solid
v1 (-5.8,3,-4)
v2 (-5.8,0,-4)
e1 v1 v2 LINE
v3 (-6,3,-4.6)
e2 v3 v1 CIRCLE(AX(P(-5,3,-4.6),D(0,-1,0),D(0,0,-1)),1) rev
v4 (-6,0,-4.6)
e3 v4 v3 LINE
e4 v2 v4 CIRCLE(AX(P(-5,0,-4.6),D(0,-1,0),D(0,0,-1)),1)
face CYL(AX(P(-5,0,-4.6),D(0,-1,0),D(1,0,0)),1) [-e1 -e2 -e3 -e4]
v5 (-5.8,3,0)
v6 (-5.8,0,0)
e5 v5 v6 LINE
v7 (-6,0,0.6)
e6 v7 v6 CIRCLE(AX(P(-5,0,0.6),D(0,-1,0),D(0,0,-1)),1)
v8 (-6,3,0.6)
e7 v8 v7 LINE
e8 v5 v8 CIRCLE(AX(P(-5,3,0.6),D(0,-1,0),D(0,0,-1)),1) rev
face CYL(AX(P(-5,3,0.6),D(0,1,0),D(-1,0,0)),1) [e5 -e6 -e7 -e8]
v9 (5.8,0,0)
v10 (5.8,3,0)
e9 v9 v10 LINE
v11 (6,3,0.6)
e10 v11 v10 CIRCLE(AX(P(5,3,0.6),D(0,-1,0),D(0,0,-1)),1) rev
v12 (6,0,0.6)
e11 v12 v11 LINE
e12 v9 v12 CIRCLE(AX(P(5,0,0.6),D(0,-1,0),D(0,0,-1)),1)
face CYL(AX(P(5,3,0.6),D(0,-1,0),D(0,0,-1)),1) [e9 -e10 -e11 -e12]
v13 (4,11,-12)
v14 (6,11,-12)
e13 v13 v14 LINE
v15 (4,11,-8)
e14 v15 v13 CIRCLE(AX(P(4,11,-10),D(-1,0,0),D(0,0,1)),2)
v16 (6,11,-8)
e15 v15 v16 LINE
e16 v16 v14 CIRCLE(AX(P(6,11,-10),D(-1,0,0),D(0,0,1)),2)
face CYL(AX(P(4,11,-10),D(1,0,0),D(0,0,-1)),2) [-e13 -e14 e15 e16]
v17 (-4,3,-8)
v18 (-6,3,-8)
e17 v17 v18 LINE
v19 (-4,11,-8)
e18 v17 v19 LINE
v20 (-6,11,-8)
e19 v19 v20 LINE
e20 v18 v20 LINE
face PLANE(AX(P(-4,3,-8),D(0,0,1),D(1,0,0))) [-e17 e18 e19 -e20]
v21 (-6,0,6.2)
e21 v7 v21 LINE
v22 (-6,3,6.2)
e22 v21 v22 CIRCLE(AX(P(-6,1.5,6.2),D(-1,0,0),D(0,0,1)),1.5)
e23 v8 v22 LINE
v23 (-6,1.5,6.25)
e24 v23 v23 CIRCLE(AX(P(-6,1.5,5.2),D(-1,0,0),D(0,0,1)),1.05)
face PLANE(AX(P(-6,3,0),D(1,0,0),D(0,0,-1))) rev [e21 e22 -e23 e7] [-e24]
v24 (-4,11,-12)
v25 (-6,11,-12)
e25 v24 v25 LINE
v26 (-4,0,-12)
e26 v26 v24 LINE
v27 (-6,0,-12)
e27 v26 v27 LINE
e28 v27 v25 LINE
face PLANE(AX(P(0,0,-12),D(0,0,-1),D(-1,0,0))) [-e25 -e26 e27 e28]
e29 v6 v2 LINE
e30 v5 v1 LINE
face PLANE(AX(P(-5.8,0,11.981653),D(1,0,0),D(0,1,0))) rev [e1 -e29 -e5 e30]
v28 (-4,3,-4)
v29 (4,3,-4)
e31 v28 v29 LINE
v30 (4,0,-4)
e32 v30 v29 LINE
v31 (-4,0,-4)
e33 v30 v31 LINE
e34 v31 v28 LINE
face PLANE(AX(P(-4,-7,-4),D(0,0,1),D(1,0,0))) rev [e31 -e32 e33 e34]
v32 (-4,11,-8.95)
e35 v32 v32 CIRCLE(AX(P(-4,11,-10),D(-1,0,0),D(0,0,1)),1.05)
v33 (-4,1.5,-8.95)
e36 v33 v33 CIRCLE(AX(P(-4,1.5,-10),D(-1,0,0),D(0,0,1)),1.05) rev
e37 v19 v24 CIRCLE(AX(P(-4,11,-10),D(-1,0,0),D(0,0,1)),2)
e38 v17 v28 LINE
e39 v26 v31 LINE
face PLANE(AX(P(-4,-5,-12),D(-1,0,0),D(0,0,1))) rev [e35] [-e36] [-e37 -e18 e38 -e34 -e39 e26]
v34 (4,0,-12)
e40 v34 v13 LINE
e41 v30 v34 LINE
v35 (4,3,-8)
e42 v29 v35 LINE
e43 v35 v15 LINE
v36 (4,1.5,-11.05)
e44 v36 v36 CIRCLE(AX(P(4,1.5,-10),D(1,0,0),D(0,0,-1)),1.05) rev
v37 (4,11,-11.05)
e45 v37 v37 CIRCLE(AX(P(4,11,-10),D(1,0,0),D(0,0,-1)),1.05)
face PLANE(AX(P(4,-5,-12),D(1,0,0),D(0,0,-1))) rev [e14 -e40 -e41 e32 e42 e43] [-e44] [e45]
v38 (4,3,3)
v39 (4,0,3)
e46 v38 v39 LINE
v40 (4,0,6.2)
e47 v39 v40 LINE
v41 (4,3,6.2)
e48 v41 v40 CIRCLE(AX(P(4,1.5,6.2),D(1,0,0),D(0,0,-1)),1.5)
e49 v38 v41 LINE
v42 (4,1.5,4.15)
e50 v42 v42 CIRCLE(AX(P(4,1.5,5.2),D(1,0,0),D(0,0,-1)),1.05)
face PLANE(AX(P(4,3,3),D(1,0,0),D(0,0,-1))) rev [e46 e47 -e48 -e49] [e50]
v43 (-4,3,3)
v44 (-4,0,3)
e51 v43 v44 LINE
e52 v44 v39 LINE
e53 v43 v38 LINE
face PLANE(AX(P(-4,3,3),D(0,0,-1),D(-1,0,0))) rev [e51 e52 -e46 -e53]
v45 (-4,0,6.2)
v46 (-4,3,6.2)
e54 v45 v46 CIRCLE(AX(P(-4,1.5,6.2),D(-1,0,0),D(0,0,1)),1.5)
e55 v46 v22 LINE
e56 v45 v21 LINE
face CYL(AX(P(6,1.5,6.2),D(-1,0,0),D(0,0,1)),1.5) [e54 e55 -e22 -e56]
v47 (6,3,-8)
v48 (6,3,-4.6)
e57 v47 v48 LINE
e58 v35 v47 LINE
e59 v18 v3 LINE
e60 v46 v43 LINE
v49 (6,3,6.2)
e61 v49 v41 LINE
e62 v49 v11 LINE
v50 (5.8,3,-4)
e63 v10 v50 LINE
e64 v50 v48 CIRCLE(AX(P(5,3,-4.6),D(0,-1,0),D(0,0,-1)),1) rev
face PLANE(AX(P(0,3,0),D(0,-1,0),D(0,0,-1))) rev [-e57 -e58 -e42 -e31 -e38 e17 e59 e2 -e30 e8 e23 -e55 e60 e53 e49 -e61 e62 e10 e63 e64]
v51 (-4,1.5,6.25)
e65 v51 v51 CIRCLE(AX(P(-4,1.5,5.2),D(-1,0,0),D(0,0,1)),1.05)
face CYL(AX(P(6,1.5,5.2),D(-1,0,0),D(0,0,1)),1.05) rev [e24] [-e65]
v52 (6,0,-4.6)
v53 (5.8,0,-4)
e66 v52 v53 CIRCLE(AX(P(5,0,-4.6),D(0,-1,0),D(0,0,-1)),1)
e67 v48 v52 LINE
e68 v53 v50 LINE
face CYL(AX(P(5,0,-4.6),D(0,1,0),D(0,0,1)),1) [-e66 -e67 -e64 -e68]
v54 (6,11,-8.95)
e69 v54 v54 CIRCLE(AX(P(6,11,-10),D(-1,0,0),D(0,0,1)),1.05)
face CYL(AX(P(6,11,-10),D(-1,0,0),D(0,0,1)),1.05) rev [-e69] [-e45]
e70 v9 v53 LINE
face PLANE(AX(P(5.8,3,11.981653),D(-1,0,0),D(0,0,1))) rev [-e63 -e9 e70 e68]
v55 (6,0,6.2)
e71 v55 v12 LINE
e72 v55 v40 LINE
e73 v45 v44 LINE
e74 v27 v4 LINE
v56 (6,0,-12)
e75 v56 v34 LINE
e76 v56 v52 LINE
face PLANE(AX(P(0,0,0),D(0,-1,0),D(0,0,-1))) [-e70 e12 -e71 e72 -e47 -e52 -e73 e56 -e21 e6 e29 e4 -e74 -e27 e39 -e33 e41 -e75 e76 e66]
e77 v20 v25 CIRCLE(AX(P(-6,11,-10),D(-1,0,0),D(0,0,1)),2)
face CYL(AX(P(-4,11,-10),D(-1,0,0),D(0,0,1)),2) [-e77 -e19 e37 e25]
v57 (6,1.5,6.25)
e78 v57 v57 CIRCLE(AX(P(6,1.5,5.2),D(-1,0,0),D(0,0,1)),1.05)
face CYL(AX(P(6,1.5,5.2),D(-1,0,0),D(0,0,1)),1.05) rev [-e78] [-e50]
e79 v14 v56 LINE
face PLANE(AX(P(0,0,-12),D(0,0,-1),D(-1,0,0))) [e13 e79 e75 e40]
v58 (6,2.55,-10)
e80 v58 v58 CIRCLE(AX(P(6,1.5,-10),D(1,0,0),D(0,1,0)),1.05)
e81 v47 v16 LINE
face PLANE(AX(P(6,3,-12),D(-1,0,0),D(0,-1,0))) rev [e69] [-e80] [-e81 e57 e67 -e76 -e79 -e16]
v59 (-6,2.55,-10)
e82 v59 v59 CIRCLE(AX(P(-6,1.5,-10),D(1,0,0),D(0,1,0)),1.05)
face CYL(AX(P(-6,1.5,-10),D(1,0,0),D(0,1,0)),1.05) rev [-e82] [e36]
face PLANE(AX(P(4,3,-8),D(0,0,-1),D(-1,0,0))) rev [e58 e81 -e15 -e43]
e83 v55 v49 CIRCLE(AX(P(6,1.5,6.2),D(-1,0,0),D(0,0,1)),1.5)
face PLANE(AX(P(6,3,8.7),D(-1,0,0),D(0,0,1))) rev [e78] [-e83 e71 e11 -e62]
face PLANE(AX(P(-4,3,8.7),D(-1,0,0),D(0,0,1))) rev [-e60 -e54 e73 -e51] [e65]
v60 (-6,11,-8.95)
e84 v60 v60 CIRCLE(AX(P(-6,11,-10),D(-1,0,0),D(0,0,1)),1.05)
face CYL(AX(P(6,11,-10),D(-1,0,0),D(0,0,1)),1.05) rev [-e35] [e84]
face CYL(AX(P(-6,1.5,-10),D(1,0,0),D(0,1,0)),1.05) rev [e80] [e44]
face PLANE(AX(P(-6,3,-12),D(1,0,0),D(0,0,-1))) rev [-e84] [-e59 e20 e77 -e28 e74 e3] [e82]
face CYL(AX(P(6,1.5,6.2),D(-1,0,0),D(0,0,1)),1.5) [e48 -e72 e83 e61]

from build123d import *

# Parameters (mm, degrees)
EXTRUDE_1_DEPTH          = 3
SKETCH_2_OUTSIDE_W       = 13.724
SKETCH_2_OUTSIDE_H       = 8.024
CUT_EXTRUDE_1_DEPTH      = 12
SKETCH_3_R               = 1.05
CUT_EXTRUDE_2_DEPTH      = 12
SKETCH_4_R               = 0.95
EXTRUDE_2_DEPTH          = 4
SKETCH_5_W               = 12
SKETCH_5_H               = 3
EXTRUDE_3_DEPTH          = 8
SKETCH_6_R               = 1.05
CUT_EXTRUDE_3_DEPTH      = 12
SKETCH_8_W               = 8
SKETCH_8_H               = 4
CUT_EXTRUDE_4_DEPTH      = 8
EXTRUDE_5_DEPTH          = 2
SKETCH_12_W              = 11.6
SKETCH_12_H              = 3
EXTRUDE_8_DEPTH          = 4
FILLET_1_R               = 1
SKETCH_13_W              = 8
SKETCH_13_H              = 4
CUT_EXTRUDE_5_DEPTH      = 10
FILLET_2_R               = 1
CUT_EXTRUDE_6_DEPTH      = 21.322401433
CUT_EXTRUDE_6_DEPTH_BACK = 21.322401433
SKETCH_11_R              = 1.05


with BuildPart() as part:
    # 草图1 → 凸台-拉伸1 (new body)
    with BuildSketch(Plane(origin=(0, 0, 0), x_dir=(1, 0, 0), z_dir=(0, 1, 0))):
        Polygon((-6, 0), (6, 0), (6, -8.7), (4, -8.7), (4, -3), (-4, -3), (-4, -8.7), (-6, -8.7), align=None)
    extrude(amount=EXTRUDE_1_DEPTH)

    # 草图2 outside → 切除-拉伸1 (cut)
    with BuildSketch(Plane.ZY.offset(6)):
        with Locations((4.35, 1.5)):
            Rectangle(SKETCH_2_OUTSIDE_W, SKETCH_2_OUTSIDE_H)
        with BuildLine():
            Line((6.2, 3), (0, 3))
            Line((0, 3), (0, 0))
            Line((0, 0), (6.2, 0))
            ThreePointArc((6.2, 0), (7.7, 1.5), (6.2, 3))
        make_face(mode=Mode.SUBTRACT)
    extrude(amount=-CUT_EXTRUDE_1_DEPTH, mode=Mode.SUBTRACT)

    # 草图3 → 切除-拉伸2 (cut)
    with BuildSketch(Plane.ZY.offset(6)):
        with Locations((5.2, 1.5)):
            Circle(SKETCH_3_R)
    extrude(amount=-CUT_EXTRUDE_2_DEPTH, mode=Mode.SUBTRACT)

    # 草图4 → 凸台-拉伸2 (add)
    with BuildSketch(Plane(origin=(0, 0, 0), x_dir=(-1, 0, 0), z_dir=(0, 0, -1))):
        with Locations((0, 1.5)):
            Circle(SKETCH_4_R)
    extrude(amount=EXTRUDE_2_DEPTH)

    # 草图5 → 凸台-拉伸3 (add)
    with BuildSketch(Plane(origin=(0, 0, -4), x_dir=(-1, 0, 0), z_dir=(0, 0, -1))):
        with Locations((0, 1.5)):
            Rectangle(SKETCH_5_W, SKETCH_5_H)
    extrude(amount=EXTRUDE_3_DEPTH)

    # 草图6 → 切除-拉伸3 (cut)
    with BuildSketch(Plane(origin=(6, 0, 0), x_dir=(0, 0, -1), z_dir=(1, 0, 0))):
        with Locations(Location((10, 1.5, 0), (0, 0, 90))):
            Circle(SKETCH_6_R)
    extrude(amount=-CUT_EXTRUDE_3_DEPTH, mode=Mode.SUBTRACT)

    # 草图8 → 切除-拉伸4 (cut)
    with BuildSketch(Plane(origin=(0, 3, 0), x_dir=(1, 0, 0), z_dir=(0, 1, 0))):
        with Locations((0, 10)):
            Rectangle(SKETCH_8_W, SKETCH_8_H)
    extrude(amount=-CUT_EXTRUDE_4_DEPTH, mode=Mode.SUBTRACT)

    # 草图10 → 凸台-拉伸5 (add)
    with BuildSketch(Plane.ZY.offset(6)):
        with BuildLine():
            Line((-12, 3), (-8, 3))
            Line((-8, 3), (-8, 11))
            ThreePointArc((-8, 11), (-10, 13), (-12, 11))
            Line((-12, 11), (-12, 3))
        make_face()
    extrude_5 = extrude(amount=-EXTRUDE_5_DEPTH)

    # 镜向1: 凸台-拉伸5 across plane
    add(extrude_5.mirror(Plane(origin=(0, 0, 0), x_dir=(0, 0, 1), z_dir=(1, 0, 0))))

    # 草图12 → 凸台-拉伸8 (add)
    with BuildSketch(Plane.XY.offset(-4)):
        with Locations((0, 1.5)):
            Rectangle(SKETCH_12_W, SKETCH_12_H)
    extrude(amount=EXTRUDE_8_DEPTH)

    # 圆角1
    # the kernel refuses this fillet: 1 mm, written as the material it takes off along each edge
    with BuildSketch(Plane(origin=(6, -1.5, 0), x_dir=(-1, 0, 0), z_dir=(0, 1, 0))) as fillet_1_piece_1:
        with BuildLine():
            CenterArc((1, 0.6), FILLET_1_R, 180, 36.869897646)
            Line((0, 0.6), (-0.02, 0.6))
            Line((-0.02, 0.6), (-0.02, 0))
            Line((-0.02, 0), (0, -0.02))
            ThreePointArc((0, -0.02), (0.1, -0.02), (0.184, -0.012))
            Line((0.184, -0.012), (0.2, 0))
        make_face()
    extrude(amount=6, mode=Mode.SUBTRACT)
    with BuildSketch(Plane(origin=(-6, -1.5, 0), x_dir=(1, 0, 0), z_dir=(0, 1, 0))) as fillet_1_piece_2:
        with BuildLine():
            CenterArc((1, -0.6), FILLET_1_R, 143.130102354, 36.869897646)
            Line((0, -0.6), (-0.02, -0.6))
            Line((-0.02, -0.6), (-0.02, 0))
            Line((-0.02, 0), (0, 0.02))
            ThreePointArc((0, 0.02), (0.1, 0.02), (0.184, 0.012))
            Line((0.184, 0.012), (0.2, 0))
        make_face()
    extrude(amount=6, mode=Mode.SUBTRACT)

    # 草图13 → 切除-拉伸5 (cut)
    with BuildSketch(Plane(origin=(0, 3, 0), x_dir=(1, 0, 0), z_dir=(0, 1, 0))):
        with Locations((0, 6)):
            Rectangle(SKETCH_13_W, SKETCH_13_H)
    extrude(amount=-CUT_EXTRUDE_5_DEPTH, mode=Mode.SUBTRACT)

    # 圆角2
    # the kernel refuses this fillet: 1 mm, written as the material it takes off along each edge
    with BuildSketch(Plane(origin=(-6, 4.5, -4), x_dir=(0, 0, -1), z_dir=(0, -1, 0)), Plane(origin=(6, -1.5, -4), x_dir=(0, 0, -1), z_dir=(0, 1, 0))) as fillet_2_piece_1:
        with BuildLine():
            CenterArc((0.6, 1), FILLET_2_R, 233.130102354, 36.869897646)
            Line((0, 0.2), (-0.012, 0.184))
            ThreePointArc((-0.012, 0.184), (-0.02, 0.1), (-0.02, 0))
            Line((-0.02, 0), (0, -0.02))
            Line((0, -0.02), (0.6, -0.02))
            Line((0.6, -0.02), (0.6, 0))
        make_face()
    extrude(amount=6, mode=Mode.SUBTRACT)

    # 草图11 → 切除-拉伸6 (cut, two sides: drawn at the far end of the back side and taken through both)
    with BuildSketch(Plane.ZY.offset(4).offset(-CUT_EXTRUDE_6_DEPTH_BACK)):
        with Locations((-10, 11)):
            Circle(SKETCH_11_R)
    extrude(amount=CUT_EXTRUDE_6_DEPTH + CUT_EXTRUDE_6_DEPTH_BACK, mode=Mode.SUBTRACT)


solid = part.part
